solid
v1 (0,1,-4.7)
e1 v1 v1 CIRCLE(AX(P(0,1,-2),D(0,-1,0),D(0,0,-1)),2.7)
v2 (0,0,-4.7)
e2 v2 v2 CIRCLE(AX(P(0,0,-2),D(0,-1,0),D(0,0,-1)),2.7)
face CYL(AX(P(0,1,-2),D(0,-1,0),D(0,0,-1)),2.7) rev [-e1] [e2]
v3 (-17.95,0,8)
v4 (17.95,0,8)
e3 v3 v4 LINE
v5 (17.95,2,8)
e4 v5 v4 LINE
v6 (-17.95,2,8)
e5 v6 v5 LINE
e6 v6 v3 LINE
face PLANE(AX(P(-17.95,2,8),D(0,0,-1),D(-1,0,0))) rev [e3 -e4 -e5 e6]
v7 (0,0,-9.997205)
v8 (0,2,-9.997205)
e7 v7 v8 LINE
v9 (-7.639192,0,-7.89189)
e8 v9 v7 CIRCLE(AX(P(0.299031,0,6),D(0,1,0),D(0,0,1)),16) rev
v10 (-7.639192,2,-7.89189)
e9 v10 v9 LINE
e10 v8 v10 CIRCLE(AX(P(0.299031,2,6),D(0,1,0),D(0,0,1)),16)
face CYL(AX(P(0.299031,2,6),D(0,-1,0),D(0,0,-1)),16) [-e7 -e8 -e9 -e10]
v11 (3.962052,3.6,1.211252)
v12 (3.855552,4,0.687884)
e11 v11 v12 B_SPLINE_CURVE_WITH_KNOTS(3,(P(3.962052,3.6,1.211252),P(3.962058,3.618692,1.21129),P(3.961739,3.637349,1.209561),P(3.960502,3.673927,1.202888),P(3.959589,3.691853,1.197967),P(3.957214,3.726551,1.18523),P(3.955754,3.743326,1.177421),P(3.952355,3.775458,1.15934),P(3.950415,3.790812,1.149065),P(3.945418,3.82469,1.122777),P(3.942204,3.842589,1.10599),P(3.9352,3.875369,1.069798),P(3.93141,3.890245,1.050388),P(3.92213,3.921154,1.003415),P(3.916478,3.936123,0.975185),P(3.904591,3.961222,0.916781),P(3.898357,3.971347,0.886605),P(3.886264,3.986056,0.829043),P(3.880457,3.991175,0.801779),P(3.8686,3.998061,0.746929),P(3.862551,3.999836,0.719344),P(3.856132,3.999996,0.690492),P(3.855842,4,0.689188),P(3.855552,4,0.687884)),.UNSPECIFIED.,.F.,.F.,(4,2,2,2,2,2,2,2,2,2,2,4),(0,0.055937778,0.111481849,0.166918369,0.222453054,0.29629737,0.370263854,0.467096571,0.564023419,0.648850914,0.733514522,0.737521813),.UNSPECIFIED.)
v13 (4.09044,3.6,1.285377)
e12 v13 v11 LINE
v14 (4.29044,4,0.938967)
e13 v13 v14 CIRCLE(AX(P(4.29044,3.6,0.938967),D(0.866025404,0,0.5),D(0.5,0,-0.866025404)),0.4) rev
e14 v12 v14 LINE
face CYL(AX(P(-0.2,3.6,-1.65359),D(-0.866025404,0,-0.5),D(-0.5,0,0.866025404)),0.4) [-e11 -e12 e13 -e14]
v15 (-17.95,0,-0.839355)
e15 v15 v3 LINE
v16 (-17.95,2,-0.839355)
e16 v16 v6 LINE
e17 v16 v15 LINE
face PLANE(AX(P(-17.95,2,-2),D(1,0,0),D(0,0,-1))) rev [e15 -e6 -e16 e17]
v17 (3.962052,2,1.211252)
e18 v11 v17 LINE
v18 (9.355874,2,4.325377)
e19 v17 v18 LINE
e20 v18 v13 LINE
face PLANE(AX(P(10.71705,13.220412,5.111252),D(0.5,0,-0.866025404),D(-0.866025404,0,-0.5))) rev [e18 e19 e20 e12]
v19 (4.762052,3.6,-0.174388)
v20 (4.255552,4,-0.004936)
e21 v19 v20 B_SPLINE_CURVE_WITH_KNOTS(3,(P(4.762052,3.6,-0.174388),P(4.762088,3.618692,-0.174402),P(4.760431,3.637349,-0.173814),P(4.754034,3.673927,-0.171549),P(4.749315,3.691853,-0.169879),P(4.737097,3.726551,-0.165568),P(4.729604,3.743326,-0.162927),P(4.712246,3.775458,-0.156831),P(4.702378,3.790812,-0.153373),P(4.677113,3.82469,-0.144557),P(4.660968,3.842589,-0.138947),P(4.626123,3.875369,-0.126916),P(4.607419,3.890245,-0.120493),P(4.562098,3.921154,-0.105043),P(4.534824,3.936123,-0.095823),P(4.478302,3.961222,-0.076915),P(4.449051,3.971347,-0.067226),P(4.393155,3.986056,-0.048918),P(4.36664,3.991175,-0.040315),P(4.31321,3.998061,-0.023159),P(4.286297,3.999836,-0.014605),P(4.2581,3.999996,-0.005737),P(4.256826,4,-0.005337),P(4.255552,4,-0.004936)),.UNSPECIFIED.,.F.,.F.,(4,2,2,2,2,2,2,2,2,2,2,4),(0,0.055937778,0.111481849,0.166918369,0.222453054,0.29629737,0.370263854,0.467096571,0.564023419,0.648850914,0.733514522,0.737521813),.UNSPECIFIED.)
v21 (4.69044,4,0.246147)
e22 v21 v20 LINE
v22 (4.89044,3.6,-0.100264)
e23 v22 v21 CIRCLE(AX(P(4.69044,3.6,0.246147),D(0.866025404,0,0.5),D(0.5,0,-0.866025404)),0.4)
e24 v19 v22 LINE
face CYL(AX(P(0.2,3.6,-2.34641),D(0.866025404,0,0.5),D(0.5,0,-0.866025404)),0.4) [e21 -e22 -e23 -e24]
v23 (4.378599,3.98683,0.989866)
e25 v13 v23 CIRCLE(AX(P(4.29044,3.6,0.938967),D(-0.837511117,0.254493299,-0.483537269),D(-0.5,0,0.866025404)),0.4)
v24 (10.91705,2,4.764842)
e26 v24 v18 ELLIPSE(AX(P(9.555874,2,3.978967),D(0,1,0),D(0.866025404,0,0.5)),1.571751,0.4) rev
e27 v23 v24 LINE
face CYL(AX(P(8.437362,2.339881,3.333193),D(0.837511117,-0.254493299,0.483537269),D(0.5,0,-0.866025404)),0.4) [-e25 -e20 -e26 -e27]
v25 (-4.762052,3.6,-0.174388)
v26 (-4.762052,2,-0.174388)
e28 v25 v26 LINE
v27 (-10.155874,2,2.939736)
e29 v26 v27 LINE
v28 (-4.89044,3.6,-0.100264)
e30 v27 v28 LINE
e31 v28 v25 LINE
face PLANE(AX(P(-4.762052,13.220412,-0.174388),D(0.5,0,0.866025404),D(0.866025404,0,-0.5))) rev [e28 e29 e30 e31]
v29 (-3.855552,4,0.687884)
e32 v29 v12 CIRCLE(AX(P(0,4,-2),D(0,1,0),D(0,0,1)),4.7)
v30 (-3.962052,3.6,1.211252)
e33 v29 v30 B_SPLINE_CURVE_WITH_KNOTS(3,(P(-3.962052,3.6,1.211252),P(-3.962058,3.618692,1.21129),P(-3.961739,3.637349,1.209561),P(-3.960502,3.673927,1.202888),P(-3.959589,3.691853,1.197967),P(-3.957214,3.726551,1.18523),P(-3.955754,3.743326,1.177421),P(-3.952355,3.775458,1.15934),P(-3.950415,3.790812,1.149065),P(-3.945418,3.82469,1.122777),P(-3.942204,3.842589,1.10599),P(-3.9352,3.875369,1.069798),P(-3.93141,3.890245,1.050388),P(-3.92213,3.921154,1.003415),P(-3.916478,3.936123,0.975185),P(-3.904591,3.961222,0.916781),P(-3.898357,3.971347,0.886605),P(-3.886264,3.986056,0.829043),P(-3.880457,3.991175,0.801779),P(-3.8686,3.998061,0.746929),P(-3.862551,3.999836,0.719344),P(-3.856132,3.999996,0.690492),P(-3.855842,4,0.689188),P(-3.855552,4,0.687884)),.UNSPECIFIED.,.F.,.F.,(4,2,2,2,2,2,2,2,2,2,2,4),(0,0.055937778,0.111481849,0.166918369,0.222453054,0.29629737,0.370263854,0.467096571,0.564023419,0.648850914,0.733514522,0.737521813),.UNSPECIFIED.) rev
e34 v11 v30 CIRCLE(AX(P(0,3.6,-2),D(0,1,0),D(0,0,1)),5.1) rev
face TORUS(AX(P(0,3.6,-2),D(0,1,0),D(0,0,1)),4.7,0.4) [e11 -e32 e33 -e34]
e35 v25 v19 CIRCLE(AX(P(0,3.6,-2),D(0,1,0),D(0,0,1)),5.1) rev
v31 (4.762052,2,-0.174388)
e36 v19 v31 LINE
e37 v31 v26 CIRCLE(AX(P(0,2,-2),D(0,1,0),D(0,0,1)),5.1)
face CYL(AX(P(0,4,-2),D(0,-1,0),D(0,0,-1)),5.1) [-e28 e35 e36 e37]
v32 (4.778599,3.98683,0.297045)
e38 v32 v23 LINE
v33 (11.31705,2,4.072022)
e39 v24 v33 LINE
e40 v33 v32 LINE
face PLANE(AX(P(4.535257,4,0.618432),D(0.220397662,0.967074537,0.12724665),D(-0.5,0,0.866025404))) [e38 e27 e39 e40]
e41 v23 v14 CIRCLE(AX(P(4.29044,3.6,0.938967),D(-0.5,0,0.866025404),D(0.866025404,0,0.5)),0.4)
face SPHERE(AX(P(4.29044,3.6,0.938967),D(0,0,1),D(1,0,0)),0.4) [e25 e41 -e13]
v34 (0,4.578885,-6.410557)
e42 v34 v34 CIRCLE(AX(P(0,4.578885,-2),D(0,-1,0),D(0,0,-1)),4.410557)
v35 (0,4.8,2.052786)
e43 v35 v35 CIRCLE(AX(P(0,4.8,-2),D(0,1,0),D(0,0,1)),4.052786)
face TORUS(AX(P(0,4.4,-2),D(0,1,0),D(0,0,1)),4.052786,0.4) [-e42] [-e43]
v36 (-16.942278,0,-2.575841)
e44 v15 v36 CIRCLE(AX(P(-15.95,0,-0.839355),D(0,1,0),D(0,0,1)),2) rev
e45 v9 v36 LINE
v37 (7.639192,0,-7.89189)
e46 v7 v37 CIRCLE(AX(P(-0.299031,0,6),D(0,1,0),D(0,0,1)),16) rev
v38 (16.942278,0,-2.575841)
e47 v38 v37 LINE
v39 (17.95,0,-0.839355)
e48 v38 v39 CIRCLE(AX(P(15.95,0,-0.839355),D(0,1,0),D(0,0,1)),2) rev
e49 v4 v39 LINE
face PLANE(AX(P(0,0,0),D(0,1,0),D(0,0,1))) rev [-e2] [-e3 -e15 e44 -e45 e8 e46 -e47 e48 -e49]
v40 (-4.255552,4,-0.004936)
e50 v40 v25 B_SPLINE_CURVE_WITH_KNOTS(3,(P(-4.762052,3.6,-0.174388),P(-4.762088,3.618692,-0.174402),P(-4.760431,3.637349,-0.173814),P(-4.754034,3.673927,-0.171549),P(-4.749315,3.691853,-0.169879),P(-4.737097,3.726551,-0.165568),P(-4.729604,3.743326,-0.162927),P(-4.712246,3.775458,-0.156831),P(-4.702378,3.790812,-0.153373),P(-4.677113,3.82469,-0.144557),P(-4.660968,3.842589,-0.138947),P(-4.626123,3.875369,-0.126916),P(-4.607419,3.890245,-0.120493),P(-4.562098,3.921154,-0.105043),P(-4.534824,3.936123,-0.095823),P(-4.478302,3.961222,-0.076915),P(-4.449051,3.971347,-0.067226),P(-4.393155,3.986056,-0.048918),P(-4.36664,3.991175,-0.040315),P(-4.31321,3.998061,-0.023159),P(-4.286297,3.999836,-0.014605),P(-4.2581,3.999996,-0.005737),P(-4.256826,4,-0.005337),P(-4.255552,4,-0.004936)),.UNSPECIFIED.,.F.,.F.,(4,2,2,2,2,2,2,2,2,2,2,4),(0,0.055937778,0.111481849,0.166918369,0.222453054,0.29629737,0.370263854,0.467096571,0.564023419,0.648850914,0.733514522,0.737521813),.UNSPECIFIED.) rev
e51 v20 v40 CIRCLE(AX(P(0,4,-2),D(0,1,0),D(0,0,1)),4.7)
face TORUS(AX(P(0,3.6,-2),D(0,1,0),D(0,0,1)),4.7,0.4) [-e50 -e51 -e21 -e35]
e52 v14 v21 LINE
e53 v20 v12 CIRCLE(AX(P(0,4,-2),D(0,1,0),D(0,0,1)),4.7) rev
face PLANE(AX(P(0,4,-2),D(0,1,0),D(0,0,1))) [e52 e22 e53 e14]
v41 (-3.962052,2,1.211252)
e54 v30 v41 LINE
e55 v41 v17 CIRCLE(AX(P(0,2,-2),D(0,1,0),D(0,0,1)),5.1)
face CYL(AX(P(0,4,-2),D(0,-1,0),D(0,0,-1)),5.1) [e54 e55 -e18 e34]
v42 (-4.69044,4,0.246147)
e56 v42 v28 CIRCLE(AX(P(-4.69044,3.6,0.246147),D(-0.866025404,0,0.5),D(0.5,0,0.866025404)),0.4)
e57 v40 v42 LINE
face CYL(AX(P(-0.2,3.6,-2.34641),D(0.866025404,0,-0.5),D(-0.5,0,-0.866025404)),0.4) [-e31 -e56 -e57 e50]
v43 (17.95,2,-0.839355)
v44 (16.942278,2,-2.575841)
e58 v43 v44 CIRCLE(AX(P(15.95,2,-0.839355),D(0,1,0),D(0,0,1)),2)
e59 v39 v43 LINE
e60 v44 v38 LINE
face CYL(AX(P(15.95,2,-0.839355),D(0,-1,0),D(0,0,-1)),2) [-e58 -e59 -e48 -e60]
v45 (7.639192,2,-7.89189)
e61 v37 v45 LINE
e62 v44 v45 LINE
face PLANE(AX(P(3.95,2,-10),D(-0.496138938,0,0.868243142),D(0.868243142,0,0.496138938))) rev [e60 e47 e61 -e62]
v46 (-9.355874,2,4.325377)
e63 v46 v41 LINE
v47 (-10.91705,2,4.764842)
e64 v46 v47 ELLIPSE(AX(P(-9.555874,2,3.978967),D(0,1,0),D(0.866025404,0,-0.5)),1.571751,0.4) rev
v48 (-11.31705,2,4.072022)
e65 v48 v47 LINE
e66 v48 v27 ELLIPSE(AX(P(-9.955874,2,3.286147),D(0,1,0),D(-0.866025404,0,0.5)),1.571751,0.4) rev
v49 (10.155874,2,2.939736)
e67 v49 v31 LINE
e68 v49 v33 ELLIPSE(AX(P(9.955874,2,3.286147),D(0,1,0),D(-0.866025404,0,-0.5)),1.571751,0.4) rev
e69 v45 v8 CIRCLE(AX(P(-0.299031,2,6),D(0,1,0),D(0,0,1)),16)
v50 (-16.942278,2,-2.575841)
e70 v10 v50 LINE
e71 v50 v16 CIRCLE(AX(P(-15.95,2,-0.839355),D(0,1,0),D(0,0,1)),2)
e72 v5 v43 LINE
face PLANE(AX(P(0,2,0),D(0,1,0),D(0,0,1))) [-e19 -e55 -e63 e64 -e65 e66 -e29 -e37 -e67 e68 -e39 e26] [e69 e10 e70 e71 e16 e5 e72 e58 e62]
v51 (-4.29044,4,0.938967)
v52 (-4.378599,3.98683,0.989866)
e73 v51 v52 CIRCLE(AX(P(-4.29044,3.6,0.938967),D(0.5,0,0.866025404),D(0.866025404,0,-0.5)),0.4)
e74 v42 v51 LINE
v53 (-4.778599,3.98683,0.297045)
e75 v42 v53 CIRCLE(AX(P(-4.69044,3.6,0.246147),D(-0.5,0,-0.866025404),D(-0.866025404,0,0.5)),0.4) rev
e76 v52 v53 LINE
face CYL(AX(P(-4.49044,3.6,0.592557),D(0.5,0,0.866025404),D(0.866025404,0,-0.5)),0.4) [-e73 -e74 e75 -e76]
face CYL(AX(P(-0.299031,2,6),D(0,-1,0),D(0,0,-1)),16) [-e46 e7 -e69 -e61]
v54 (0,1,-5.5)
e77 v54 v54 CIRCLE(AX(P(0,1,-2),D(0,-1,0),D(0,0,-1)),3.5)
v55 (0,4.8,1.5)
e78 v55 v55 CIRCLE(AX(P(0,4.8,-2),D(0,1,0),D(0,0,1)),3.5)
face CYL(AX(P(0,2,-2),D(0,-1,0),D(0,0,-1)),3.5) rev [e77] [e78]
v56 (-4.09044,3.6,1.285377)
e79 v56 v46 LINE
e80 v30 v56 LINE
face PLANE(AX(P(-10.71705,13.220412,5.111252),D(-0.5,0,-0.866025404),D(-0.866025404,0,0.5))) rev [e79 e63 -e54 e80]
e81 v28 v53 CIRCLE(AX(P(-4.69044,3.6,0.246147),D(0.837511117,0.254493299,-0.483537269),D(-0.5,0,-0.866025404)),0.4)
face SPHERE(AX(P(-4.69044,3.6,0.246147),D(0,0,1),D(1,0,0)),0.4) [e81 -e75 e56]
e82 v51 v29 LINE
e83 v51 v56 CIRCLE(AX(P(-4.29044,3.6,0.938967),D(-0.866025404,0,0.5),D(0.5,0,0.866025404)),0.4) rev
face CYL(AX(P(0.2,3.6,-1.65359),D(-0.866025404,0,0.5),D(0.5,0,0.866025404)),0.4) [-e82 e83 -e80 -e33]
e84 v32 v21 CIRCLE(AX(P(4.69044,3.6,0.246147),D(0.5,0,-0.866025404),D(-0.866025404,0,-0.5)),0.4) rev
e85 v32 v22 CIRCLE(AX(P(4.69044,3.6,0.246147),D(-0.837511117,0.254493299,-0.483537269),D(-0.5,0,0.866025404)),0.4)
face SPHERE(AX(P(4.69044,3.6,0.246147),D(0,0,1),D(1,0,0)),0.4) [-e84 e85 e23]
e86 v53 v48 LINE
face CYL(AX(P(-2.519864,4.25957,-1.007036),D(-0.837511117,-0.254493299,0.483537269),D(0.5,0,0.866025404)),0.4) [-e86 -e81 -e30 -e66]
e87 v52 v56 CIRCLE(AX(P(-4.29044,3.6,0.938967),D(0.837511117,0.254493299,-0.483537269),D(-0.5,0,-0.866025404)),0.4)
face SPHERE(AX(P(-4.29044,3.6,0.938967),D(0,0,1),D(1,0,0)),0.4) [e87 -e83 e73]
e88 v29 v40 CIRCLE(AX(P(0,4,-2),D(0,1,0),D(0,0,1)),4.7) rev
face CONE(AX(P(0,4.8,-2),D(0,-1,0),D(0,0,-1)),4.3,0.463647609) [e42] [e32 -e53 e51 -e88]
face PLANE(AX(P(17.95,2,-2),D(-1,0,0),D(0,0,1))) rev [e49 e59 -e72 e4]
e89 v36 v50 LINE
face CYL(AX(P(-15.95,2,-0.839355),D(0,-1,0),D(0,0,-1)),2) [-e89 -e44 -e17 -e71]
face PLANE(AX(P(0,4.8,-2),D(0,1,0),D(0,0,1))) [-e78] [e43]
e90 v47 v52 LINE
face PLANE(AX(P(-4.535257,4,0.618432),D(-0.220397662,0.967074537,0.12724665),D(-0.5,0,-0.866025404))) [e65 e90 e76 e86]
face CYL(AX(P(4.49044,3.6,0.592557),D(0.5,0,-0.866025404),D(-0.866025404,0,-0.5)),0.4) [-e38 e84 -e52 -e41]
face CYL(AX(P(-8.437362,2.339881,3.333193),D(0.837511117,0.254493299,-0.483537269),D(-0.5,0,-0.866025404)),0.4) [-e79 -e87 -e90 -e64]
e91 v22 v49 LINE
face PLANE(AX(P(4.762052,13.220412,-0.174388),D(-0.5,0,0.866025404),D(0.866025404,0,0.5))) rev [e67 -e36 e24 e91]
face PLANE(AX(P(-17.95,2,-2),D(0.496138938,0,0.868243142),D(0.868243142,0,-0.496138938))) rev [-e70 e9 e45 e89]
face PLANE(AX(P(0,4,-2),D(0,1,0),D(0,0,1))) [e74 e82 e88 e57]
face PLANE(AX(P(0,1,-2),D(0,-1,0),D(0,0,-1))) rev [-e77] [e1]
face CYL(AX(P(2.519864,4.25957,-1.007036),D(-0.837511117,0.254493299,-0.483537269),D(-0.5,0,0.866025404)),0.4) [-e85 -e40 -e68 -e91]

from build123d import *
from OCP.BRepFilletAPI import BRepFilletAPI_MakeChamfer

# Parameters (mm, degrees)
SKETCH_1_R       = 3.5
EXTRUDE_1_DEPTH  = 2
FILLET_1_R       = 2
FILLET_2_R       = 16
SKETCH_2_R       = 5.1000000000000005
SKETCH_2_R_2     = 3.5
EXTRUDE_2_DEPTH  = 2
SKETCH_3_R       = 3.5
SKETCH_3_R_2     = 2.7
EXTRUDE_3_DEPTH  = 1
EXTRUDE_4_DEPTH  = 2
CHAMFER_1_SIZE   = 7.6
CHAMFER_1_SIZE_2 = 2
FILLET_3_R       = 0.4
SKETCH_5_R       = 4.3
SKETCH_5_R_2     = 3.5
EXTRUDE_5_DEPTH  = 0.8
CHAMFER_2_SIZE2  = 0.8
CHAMFER_2_SIZE   = 0.4


with BuildPart() as part:
    # Эскиз1 → Бобышка-Вытянуть1 (new body)
    with BuildSketch(Plane(origin=(0, 0, 0), x_dir=(1, 0, 0), z_dir=(0, 1, 0))):
        Polygon((-17.95, 2.0000000000000018), (-3.950000000000008, 10), (3.9499999999999997, 10), (17.95, 2.0000000000000018), (17.949999999999996, -7.999999999999998), (-17.950000000000006, -7.999999999999998), align=None)
        with Locations(Location((0, 2.0000000000000018, 0), (0, 0, 270))):
            Circle(SKETCH_1_R, mode=Mode.SUBTRACT)
    extrude(amount=EXTRUDE_1_DEPTH)

    # Скругление1
    fillet_1_edges = [part.edges().sort_by_distance(p)[0] for p in [
        (-17.95, 1, -2.0000000000000018),
        (17.95, 1, -2.0000000000000018),
    ]]
    fillet(fillet_1_edges, radius=FILLET_1_R)

    # Скругление2
    # the kernel refuses this fillet: 16 mm, written as the material it takes off along each edge
    with BuildSketch(Plane(origin=(3.9499999999999997, -10.622577482985493, -10), x_dir=(-1, 0, 0), z_dir=(0, 1, 0))) as fillet_2_piece_1:
        with BuildLine():
            CenterArc((FILLET_2_R * 0.265564437075, FILLET_2_R), FILLET_2_R, 240.25511870305778, 29.744881296942253)
            Line((-FILLET_2_R * 0.230574501282, FILLET_2_R * 0.131756857876), (0, 0))
            Line((0, 0), (FILLET_2_R * 0.265564437075, 0))
        make_face()
    extrude(amount=23.245154965970986, mode=Mode.SUBTRACT)
    with BuildSketch(Plane(origin=(-3.950000000000008, -10.6225774829855, -10), x_dir=(-0.8682431421244592, 0, 0.496138938356834), z_dir=(0, 1, 0))) as fillet_2_piece_2:
        with BuildLine():
            CenterArc((FILLET_2_R * 0.265564437075, FILLET_2_R), FILLET_2_R, 240.25511870305778, 29.744881296942253)
            Line((-FILLET_2_R * 0.230574501282, FILLET_2_R * 0.131756857876), (0, 0))
            Line((0, 0), (FILLET_2_R * 0.265564437075, 3e-17))
        make_face()
    extrude(amount=23.245154965971, mode=Mode.SUBTRACT)

    # Эскиз2 → Бобышка-Вытянуть2 (add)
    with BuildSketch(Plane(origin=(0, 2, 0), x_dir=(1, 0, 0), z_dir=(0, 1, 0))):
        with Locations(Location((0, 2.0000000000000018, 0), (0, 0, 270))):
            Circle(SKETCH_2_R)
        with Locations(Location((0, 2.0000000000000018, 0), (0, 0, 270))):
            Circle(SKETCH_2_R_2, mode=Mode.SUBTRACT)
    extrude(amount=EXTRUDE_2_DEPTH)

    # Эскиз3 → Бобышка-Вытянуть3 (add)
    with BuildSketch(Plane.XZ):
        with Locations(Location((0, -2.0000000000000018, 0), (0, 0, 270))):
            Circle(SKETCH_3_R)
        with Locations(Location((0, -2.0000000000000018, 0), (0, 0, 270))):
            Circle(SKETCH_3_R_2, mode=Mode.SUBTRACT)
    extrude(amount=-EXTRUDE_3_DEPTH)

    # Эскиз4 → Бобышка-Вытянуть4 (add)
    with BuildSketch(Plane(origin=(0, 2, 0), x_dir=(1, 0, 0), z_dir=(0, 1, 0))):
        Polygon((-4.762052269287931, 0.1743882711349406), (-11.517050418806543, -3.7256117288650747), (-10.717050418806545, -5.111252374920166), (-3.962052269287931, -1.2112523749201587), align=None)
        Polygon((10.717050418806549, -5.111252374920164), (3.9620522692879283, -1.2112523749201598), (4.762052269287931, 0.17438827113494176), (11.517050418806543, -3.7256117288650716), align=None)
    extrude(amount=EXTRUDE_4_DEPTH)

    # Фаска1
    chamfer_1_edges_1 = [part.edges().sort_by_distance(p)[0] for p in [
        (11.117050418806546, 4, 4.4184320518926175),
    ]]
    chamfer_1_side_1 = [part.faces().sort_by_distance(p)[0] for p in [
        (11.082409402655168, 4, 4.398432051892618),
    ]]
    chamfer_1_edges_2 = [part.edges().sort_by_distance(p)[0] for p in [
        (-11.117050418806544, 4, 4.418432051892621),
    ]]
    chamfer_1_side_2 = [part.faces().sort_by_distance(p)[0] for p in [
        (-11.117050418806544, 3.96, 4.418432051892621),
    ]]
    chamfer_1 = BRepFilletAPI_MakeChamfer(part.part.solid().wrapped)
    for e in chamfer_1_edges_1:
        chamfer_1.Add(CHAMFER_1_SIZE - 0.0001, CHAMFER_1_SIZE_2 - 0.0001, e.wrapped, chamfer_1_side_1[0].wrapped)
    for e in chamfer_1_edges_2:
        chamfer_1.Add(CHAMFER_1_SIZE_2 - 0.0001, CHAMFER_1_SIZE - 0.0001, e.wrapped, chamfer_1_side_2[0].wrapped)
    add(Compound.cast(chamfer_1.Shape()), mode=Mode.REPLACE)  # a hair under: the kernel refuses the full size

    # Скругление3
    fillet_3_edges = [part.edges().sort_by_distance(p)[0] for p in [
        (-4.4e-16, 4, 3.0999999999999996),
        (-4.8486981109365646, 4, -0.12436327113494033),
        (1.56e-15, 4, -7.100000000000002),
        (4.048698110936562, 4, 1.26127737492016),
        (4.848698110936564, 4, -0.12436327113494196),
        (-4.048698110936564, 4, 1.2612773749201591),
        (-4.535343952585196, 4, 0.6184820518926083),
        (4.535343952585196, 4, 0.6184820518926085),
        (8.22619718569587, 3.00005, 1.8256367288650646),
        (7.426197185695872, 3.0000500000000003, 3.2112773749201624),
        (-7.426197185695871, 3.000049999999999, 3.2112773749201633),
        (-8.22619718569587, 3.0000499999999994, 1.8256367288650677),
    ]]
    fillet(fillet_3_edges, radius=FILLET_3_R)

    # Эскиз5 → Бобышка-Вытянуть5 (add)
    with BuildSketch(Plane(origin=(0, 4, 0), x_dir=(1, 0, 0), z_dir=(0, 1, 0))):
        with Locations(Location((0, 2.0000000000000018, 0), (0, 0, 270))):
            Circle(SKETCH_5_R)
        with Locations(Location((0, 2.0000000000000018, 0), (0, 0, 90))):
            Circle(SKETCH_5_R_2, mode=Mode.SUBTRACT)
    extrude(amount=EXTRUDE_5_DEPTH)

    # Фаска2
    chamfer_2_edges = [part.edges().sort_by_distance(p)[0] for p in [
        (1.32e-15, 4, -6.300000000000002),
    ]]
    chamfer_2_side = [part.faces().sort_by_distance(p)[0] for p in [
        (1.32e-15, 4, -6.308000000000002),
    ]]
    chamfer(chamfer_2_edges, length=CHAMFER_2_SIZE - 0.0001, length2=CHAMFER_2_SIZE2 - 0.0001, reference=chamfer_2_side[0])  # a hair under: the kernel refuses the full size

    # Скругление4: read off the stored shape, not the designer's step
    # Скругление4 outline → Скругление4 (revolve, cut)
    with BuildSketch(Plane.XY.offset(-2)):
        with BuildLine():
            ThreePointArc((4.052786405, 4.8), (4.263078849, 4.740260323), (4.410557281, 4.578885438))
            Line((4.410557281, 4.578885438), (4.410557281, 4.8))
            Line((4.410557281, 4.8), (4.052786405, 4.8))
        make_face()
    revolve(axis=Axis((0, 0, -2), (0, 1, 0)), mode=Mode.SUBTRACT)


solid = part.part
